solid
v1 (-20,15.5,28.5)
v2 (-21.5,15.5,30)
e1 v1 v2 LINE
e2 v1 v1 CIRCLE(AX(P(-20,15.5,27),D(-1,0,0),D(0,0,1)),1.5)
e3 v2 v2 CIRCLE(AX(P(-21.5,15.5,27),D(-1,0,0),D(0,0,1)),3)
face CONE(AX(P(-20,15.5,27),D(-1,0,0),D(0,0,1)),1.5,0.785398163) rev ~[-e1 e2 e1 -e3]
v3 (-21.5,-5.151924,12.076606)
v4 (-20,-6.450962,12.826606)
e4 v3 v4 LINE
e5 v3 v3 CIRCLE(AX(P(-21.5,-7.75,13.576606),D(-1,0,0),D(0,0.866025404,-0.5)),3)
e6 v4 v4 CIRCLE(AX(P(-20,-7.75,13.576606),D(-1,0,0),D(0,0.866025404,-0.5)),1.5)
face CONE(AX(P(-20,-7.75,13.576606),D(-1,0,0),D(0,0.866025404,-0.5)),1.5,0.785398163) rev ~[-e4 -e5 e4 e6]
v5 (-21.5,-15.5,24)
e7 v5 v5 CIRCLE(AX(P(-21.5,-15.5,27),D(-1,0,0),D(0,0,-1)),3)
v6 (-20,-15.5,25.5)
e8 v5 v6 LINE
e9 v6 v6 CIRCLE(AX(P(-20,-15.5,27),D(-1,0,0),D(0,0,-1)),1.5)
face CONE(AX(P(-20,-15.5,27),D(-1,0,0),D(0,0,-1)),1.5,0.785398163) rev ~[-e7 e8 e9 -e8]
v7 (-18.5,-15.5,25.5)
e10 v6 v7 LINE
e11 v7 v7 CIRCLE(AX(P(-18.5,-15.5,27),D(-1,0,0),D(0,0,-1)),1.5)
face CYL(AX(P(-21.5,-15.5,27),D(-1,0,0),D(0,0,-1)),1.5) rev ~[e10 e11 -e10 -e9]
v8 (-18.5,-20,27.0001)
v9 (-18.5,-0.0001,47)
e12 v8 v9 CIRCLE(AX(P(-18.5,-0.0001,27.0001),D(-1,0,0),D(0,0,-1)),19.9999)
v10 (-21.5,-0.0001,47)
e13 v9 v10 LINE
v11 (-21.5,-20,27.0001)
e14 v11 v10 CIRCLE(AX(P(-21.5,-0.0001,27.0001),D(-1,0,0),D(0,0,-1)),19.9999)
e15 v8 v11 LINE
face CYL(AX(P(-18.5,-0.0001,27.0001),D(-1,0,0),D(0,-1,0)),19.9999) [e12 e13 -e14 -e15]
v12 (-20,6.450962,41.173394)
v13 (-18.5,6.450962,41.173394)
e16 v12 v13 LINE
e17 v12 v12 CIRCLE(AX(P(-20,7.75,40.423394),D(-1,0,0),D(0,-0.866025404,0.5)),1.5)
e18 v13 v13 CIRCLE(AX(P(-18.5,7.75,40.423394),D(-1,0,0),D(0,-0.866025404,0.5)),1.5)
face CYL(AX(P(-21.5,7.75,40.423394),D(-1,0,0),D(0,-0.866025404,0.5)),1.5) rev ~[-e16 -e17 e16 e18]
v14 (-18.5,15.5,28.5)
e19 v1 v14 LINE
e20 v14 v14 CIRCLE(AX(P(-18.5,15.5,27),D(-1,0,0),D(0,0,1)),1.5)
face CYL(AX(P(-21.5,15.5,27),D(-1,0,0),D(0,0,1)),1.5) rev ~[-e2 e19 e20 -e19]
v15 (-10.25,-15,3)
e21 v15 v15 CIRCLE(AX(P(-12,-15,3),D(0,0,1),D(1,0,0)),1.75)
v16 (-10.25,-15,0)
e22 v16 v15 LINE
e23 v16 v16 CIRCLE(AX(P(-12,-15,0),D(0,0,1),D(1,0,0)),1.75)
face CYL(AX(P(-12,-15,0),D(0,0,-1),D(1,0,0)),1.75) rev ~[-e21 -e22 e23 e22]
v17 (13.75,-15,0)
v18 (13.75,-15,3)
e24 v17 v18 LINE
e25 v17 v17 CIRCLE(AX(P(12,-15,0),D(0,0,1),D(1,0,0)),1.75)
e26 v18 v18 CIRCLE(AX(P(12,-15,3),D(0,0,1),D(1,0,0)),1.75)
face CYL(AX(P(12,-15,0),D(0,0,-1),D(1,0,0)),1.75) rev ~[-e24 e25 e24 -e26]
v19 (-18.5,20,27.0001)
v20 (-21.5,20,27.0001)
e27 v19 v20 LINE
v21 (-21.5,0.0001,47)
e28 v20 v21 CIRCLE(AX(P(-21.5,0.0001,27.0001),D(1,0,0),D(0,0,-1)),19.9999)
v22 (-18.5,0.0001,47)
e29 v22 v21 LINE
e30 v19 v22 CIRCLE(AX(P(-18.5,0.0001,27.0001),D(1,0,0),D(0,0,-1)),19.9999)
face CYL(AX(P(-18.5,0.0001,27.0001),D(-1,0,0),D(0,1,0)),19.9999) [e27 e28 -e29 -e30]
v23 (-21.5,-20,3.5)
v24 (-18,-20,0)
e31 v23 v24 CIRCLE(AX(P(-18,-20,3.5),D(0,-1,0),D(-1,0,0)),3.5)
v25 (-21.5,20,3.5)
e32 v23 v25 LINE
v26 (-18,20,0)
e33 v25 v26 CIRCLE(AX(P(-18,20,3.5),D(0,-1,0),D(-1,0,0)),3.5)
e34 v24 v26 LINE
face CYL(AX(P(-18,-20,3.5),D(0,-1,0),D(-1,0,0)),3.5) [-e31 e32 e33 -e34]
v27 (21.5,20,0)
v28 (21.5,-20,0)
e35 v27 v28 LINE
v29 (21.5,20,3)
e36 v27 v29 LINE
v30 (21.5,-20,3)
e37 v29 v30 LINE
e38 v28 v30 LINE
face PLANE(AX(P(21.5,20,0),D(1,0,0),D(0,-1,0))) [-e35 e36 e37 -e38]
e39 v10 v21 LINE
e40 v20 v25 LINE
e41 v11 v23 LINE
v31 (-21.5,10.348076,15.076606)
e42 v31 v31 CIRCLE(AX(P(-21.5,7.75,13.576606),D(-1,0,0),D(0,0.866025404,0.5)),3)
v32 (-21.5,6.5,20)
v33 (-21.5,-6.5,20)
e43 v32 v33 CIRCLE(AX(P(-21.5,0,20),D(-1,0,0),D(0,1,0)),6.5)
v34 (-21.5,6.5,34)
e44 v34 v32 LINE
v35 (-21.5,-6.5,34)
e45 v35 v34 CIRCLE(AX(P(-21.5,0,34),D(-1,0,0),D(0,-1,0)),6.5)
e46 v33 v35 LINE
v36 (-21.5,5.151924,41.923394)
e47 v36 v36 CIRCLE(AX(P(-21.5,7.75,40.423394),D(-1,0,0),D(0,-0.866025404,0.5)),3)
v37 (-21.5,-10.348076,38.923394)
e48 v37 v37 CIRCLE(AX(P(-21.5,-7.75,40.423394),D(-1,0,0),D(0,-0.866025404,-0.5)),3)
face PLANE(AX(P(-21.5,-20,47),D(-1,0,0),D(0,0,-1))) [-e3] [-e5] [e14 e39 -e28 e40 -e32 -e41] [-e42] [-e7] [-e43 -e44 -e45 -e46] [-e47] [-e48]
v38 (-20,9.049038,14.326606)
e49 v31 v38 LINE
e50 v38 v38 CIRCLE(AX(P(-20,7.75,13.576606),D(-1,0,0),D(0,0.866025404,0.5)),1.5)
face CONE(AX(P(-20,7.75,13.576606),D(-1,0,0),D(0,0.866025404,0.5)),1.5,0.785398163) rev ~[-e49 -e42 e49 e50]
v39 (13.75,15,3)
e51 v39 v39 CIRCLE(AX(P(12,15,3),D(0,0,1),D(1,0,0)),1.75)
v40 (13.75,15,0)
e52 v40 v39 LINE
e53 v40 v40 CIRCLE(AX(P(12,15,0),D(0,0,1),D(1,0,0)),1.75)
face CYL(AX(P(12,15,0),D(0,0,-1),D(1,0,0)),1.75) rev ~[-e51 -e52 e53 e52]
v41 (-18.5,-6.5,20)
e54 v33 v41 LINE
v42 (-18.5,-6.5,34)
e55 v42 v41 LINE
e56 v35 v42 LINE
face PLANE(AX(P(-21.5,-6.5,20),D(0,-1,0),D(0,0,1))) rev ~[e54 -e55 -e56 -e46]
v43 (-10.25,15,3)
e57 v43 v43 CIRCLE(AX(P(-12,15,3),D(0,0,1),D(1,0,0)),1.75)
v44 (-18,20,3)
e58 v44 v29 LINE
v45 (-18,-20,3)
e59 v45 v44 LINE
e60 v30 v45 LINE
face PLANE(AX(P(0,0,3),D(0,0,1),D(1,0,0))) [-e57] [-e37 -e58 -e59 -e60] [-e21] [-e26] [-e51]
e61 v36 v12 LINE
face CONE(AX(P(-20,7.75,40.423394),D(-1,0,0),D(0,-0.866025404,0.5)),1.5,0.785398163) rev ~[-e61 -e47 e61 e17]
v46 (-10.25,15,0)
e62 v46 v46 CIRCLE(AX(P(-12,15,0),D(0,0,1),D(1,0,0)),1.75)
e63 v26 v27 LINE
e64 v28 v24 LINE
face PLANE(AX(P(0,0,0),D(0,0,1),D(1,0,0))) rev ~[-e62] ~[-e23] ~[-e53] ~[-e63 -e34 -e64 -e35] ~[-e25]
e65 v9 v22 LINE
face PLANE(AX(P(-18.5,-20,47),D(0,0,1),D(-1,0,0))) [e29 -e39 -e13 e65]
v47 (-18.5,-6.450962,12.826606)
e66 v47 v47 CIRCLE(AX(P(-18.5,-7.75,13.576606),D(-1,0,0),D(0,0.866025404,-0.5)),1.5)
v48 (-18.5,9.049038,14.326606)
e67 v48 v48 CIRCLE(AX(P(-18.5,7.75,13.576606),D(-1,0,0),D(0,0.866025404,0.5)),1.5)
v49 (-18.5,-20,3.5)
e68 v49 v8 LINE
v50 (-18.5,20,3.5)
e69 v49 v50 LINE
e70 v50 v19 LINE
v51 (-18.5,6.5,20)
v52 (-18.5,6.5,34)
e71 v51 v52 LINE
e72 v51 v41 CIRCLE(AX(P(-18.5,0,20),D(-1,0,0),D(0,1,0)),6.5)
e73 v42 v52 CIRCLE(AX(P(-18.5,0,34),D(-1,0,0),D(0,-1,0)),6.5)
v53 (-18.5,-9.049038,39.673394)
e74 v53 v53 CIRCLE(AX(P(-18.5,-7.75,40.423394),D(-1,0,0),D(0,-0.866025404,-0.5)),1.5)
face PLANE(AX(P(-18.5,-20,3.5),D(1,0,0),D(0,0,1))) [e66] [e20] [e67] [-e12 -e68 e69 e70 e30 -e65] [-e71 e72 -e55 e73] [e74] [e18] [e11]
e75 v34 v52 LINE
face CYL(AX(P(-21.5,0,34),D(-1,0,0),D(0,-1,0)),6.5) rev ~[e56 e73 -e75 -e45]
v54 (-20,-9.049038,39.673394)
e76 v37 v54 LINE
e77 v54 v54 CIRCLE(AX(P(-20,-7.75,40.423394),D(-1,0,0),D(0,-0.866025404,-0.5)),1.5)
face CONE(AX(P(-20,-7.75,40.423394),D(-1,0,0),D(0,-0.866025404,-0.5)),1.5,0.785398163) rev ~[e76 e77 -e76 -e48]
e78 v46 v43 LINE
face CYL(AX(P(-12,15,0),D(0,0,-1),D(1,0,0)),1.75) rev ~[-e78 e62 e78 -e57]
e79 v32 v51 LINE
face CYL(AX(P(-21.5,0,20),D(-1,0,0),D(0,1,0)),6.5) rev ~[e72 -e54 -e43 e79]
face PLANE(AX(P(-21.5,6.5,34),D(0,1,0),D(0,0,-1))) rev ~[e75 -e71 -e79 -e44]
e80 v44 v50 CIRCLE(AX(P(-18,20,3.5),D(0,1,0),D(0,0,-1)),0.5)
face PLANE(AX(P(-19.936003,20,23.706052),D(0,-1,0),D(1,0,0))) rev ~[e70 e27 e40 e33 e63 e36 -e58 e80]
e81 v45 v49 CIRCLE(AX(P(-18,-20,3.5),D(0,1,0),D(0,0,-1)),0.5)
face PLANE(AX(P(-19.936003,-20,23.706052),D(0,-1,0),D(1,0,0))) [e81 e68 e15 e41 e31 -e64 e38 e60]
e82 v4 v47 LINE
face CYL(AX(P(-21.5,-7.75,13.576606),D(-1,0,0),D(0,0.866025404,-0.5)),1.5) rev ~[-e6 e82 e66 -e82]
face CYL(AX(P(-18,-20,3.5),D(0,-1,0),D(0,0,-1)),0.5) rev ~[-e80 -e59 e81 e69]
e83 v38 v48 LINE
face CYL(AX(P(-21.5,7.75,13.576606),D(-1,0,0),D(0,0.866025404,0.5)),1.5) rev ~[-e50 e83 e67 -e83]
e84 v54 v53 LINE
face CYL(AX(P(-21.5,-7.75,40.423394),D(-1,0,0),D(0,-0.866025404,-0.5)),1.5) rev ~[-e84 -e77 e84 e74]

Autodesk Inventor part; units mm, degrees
ref_plane "YZ Plane" through (0, 0, 0) normal (1, 0, 0) x (0, 1, 0)
ref_plane "XZ Plane" through (0, 0, 0) normal (0, 1, 0) x (-1, 0, 0)
ref_plane "XY Plane" through (0, 0, 0) normal (0, 0, 1) x (1, 0, 0)
sketch "草图1" plane through (0, 0, 0) normal (0, 0, 1) x (1, 0, 0)
  line L0 (21.5, -20) -> (-21.5, -20)
  line L1 (-21.5, -20) -> (-21.5, 20)
  line L2 (-21.5, 20) -> (21.5, 20)
  line L3 (21.5, 20) -> (21.5, -20)
  line L4 (21.5, -20) -> (-21.5, 20) construction
  line L5 (-21.5, -20) -> (21.5, 20) construction
  line L6 (12, -15) -> (-12, -15) construction
  line L7 (-12, -15) -> (-12, 15) construction
  line L8 (-12, 15) -> (12, 15) construction
  line L9 (12, 15) -> (12, -15) construction
  line L10 (12, -15) -> (-12, 15) construction
  line L11 (-12, -15) -> (12, 15) construction
  circle A0 centre (-12, 15) radius 1.75
  circle A1 centre (12, 15) radius 1.75
  circle A2 centre (-12, -15) radius 1.75
  circle A3 centre (12, -15) radius 1.75
  point P0 (0, 0)
  dimension "d0" = 43
  dimension "d1" = 40
  dimension "d2" = 3.5
  dimension "d3" = 24
  dimension "d4" = 30
extrude "平板1" add sketch "草图1" along normal blind 3
sketch "草图2" plane through (-18.5, -20, 0) normal (-1, 0, 0) x (0, -1, 0)
  line L0 (-40, 0) -> (0, 0)
  line L1 (0, 0) -> (0, 47)
  line L2 (0, 47) -> (-40, 47)
  line L3 (-40, 47) -> (-40, 0)
edge flange "凸缘1" height 47 angle 90 thickness 3 bend radius 0.5 thickness toward (-1, 0, 0) relief tear relief width 3 relief depth 1.5 edges at (-21.5, 0, 3) wall of the first edge with corners at (-18.5, 20, 0) (-18.5, -20, 0) (-18.5, -20, 47) (-18.5, 20, 47)
bend "折弯1"
corner "拐角1"
sketch "草图3" plane through (-21.5, -20, 47) normal (-1, 0, 0) x (0, 0, 1)
  line L0 (-27, 20) -> (-13, 20) construction
  line L1 (-27, 13.5) -> (-13, 13.5)
  line L2 (-13, 26.5) -> (-27, 26.5)
  arc A0 (-27, 26.5) -> (-27, 13.5) centre (-27, 20) ccw
  arc A1 (-13, 13.5) -> (-13, 26.5) centre (-13, 20) ccw
  line L3 (-47, 0) -> (-47, 40) projected
  point P0 (-47, 20)
  point P1 (-20, 20)
  point P2 (-47, 20)
  dimension "d16" = 27
  dimension "d17" = 27
  dimension "d18" = 13
extrude "拉伸1" cut sketch "草图3" against normal blind 10
fillet "圆角1" radius 20 2 edges at (-20, 20, 47) (-20, -20, 47)
sketch "草图4" plane through (-21.5, -20, 3.5) normal (-1, 0, 0) x (0, 0, 1)
  circle A0 centre (23.5, 35.5) radius 1.5
  arc A1 (23.5, 0) -> (23.5, 40) centre (23.5, 20) ccw projected
  line L0 (0, 40) -> (23.5, 40) projected
  line L1 (0, 40) -> (0, 0) projected
  line L2 (23.5, 0) -> (0, 0) projected
  arc A2 (30.5, 13.5) -> (30.5, 26.5) centre (30.5, 20) ccw projected
  line L3 (30.5, 13.5) -> (16.5, 13.5) projected
  arc A3 (16.5, 26.5) -> (16.5, 13.5) centre (16.5, 20) ccw projected
  line L4 (16.5, 26.5) -> (30.5, 26.5) projected
  point P0 (-3.5, 20)
  dimension "d22" = 15.5
  dimension "d23" = 3
extrude "拉伸2" cut sketch "草图4" against normal blind 10 contours A0
chamfer "倒角1" distance 1.5 angle 45 1 edges at (-21.5, 15.5, 25.5)
pattern_circular "环形阵列1" count 6 over 360 about axis through (-18.5, 0, 27) along (-1, 0, 0) of "拉伸2", "倒角1"
equation "\"d6\" = 折弯释压宽度"
equation "\"d7\" = 折弯释压深度"
equation "\"d8\" = 最小余量"
equation "\"d9\" = 折弯半径"
equation "\"d13\" = 拐角释压尺寸"
equation "\"d14\" = 间隙大小"
equation "\"d15\" = Jacobi半径尺寸"
equation "\"d32\" = 厚度"
equation "\"折弯半径\" = 厚度"
equation "\"折弯释压宽度\" = 厚度"
equation "\"折弯释压深度\" = 0.5 * 厚度"
equation "\"拐角释压尺寸\" = 4 * 厚度"
equation "\"最小余量\" = 2 * 厚度"
equation "\"过渡半径\" = 折弯半径"
equation "\"Jacobi半径尺寸\" = 折弯半径"
equation "\"间隙大小\" = 厚度"
equation "\"d5\" = 折弯半径"
equation "\"厚度\" = 3"
